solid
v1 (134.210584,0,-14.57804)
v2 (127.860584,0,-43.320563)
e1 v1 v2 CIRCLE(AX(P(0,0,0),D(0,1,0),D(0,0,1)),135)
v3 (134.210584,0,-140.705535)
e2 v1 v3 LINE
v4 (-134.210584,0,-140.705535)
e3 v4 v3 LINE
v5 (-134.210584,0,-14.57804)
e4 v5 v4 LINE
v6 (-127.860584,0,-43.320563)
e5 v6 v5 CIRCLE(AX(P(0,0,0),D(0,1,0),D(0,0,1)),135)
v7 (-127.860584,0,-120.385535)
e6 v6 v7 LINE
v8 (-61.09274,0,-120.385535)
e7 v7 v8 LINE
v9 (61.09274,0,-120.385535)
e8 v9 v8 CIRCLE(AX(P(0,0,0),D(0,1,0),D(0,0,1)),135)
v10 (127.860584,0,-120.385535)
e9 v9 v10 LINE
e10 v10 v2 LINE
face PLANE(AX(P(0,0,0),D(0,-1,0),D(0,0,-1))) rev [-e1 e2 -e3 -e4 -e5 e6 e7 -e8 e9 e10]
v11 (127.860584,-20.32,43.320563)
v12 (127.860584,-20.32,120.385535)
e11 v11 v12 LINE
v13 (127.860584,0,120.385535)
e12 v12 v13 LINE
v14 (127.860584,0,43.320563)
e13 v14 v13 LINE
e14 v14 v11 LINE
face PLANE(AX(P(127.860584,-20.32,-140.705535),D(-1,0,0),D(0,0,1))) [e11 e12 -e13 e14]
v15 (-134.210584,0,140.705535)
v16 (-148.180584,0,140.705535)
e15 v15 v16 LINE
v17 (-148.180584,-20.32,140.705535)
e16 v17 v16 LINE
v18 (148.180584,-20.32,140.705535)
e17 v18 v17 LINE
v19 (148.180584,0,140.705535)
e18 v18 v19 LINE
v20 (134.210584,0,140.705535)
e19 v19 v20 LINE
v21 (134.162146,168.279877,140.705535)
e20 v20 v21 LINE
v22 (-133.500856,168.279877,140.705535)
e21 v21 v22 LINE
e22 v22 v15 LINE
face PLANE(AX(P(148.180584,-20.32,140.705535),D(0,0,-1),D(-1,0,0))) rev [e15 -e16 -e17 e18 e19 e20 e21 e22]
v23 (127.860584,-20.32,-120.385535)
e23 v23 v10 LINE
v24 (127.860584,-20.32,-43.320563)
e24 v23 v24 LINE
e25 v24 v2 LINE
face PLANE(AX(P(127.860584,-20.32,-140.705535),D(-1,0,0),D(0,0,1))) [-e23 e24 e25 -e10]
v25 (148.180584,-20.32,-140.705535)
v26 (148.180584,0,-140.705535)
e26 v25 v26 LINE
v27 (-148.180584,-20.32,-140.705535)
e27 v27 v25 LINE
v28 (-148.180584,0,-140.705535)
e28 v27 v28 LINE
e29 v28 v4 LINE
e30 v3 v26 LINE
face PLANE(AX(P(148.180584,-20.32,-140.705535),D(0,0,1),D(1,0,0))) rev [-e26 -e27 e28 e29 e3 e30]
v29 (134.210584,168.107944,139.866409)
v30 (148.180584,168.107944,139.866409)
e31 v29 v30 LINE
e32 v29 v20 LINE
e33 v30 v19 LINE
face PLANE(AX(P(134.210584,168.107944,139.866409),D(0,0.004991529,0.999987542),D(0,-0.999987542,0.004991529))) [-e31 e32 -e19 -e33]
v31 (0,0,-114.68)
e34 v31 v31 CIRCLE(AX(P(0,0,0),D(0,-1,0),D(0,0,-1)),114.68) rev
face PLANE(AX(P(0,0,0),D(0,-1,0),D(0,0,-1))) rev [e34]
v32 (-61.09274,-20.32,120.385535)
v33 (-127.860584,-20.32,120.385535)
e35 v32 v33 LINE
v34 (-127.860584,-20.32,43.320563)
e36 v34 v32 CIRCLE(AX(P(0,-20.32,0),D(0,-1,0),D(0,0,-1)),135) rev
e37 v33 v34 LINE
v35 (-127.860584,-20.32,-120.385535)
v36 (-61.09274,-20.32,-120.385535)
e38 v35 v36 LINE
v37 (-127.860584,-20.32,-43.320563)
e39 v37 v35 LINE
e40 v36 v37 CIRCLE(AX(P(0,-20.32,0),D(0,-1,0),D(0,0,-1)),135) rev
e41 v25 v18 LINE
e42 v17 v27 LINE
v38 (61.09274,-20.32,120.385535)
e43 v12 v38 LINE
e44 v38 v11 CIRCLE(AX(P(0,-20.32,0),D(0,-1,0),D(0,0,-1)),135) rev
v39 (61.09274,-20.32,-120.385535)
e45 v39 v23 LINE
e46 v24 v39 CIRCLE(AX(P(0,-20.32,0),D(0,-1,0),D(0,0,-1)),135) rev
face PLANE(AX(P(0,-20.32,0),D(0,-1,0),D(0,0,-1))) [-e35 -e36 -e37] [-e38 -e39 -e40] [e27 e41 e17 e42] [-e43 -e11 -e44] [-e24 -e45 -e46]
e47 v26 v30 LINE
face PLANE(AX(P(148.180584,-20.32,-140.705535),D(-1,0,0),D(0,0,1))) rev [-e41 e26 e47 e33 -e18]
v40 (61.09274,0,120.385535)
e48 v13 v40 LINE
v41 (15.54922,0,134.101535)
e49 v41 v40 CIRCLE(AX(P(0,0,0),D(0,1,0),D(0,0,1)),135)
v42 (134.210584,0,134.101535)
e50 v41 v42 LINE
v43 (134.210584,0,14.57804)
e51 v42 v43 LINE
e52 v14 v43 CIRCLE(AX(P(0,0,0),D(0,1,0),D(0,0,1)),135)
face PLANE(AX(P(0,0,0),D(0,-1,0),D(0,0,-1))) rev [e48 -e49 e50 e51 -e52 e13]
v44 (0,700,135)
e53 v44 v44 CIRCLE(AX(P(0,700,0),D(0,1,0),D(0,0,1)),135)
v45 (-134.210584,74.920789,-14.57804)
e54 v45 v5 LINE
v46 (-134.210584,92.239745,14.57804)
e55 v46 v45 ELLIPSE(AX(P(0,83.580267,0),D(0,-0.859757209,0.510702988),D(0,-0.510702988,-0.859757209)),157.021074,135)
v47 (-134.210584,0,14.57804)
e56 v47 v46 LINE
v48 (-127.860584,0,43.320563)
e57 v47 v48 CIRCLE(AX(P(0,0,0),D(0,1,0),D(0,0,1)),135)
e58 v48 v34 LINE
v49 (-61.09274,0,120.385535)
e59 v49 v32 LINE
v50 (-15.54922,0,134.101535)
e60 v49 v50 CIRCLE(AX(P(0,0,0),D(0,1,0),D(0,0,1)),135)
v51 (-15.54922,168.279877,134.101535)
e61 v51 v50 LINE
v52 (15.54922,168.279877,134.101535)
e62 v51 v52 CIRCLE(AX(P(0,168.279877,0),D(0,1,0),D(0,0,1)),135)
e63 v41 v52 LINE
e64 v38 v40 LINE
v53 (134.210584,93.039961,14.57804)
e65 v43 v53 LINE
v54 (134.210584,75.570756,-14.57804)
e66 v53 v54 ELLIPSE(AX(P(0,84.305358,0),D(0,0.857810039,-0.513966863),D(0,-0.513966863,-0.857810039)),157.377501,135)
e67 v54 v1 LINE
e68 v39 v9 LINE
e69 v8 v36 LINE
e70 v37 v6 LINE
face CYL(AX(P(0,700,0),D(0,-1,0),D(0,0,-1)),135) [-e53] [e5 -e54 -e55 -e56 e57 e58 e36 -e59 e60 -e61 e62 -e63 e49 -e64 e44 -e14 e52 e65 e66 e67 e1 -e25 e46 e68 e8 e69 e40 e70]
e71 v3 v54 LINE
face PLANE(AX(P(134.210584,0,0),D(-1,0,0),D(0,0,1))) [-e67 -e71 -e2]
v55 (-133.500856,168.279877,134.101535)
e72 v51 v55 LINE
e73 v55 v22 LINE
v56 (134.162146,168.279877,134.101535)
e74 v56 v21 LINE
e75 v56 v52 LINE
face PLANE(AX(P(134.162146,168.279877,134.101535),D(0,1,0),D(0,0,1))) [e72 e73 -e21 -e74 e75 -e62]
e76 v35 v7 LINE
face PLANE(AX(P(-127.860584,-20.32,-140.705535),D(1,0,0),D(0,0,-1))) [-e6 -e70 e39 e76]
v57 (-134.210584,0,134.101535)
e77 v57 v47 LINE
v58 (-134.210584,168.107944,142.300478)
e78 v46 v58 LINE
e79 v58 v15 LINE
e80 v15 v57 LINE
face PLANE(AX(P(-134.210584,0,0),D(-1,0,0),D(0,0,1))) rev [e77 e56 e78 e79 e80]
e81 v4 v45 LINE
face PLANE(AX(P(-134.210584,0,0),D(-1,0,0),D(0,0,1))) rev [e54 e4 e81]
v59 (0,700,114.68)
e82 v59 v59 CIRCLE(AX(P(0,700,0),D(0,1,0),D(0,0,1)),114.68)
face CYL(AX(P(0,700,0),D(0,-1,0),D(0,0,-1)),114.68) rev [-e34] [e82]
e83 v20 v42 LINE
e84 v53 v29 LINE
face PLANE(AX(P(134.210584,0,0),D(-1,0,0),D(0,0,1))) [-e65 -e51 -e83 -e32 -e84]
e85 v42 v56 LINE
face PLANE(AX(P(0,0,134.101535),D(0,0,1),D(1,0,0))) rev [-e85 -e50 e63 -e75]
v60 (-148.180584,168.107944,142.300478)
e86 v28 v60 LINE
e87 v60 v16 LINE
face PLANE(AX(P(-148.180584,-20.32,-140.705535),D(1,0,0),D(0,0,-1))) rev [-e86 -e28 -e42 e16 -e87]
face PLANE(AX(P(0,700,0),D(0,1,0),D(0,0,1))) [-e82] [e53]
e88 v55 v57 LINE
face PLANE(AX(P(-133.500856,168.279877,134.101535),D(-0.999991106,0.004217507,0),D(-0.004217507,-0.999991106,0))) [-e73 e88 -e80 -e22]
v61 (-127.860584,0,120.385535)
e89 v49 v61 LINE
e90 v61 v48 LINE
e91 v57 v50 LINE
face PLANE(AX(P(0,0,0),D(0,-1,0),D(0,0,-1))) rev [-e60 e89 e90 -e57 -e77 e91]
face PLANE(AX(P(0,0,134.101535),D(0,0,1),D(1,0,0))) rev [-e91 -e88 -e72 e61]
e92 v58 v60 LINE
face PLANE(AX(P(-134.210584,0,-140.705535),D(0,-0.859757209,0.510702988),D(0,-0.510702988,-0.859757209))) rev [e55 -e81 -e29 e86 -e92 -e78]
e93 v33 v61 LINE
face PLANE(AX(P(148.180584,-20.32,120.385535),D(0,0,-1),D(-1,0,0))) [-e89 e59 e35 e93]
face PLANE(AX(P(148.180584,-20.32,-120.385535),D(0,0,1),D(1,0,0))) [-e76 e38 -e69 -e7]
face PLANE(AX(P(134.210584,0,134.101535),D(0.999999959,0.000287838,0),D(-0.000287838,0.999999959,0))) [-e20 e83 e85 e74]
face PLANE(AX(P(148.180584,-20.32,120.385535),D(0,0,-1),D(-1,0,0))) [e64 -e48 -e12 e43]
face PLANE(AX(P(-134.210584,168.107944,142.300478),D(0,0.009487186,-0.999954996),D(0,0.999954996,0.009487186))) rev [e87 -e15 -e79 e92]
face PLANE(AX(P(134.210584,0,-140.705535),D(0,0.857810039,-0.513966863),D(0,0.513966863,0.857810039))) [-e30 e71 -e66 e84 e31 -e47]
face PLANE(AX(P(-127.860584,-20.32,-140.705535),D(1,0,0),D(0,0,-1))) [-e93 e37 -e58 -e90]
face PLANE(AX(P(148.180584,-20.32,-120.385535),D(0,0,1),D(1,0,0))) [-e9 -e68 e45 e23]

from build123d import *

# Parameters (mm, degrees)
SKETCH1_R           = 135
BOSS_EXTRUDE1_DEPTH = 700
SKETCH2_W           = 296.361167152
SKETCH2_H           = 281.411070578
BOSS_EXTRUDE2_DEPTH = 20.32
SHELL1_T            = -20.32
SHELL2_START        = -20.32
SHELL2_DEPTH        = 20.32
BOSS_EXTRUDE3_DEPTH = 13.97
BOSS_EXTRUDE4_DEPTH = 13.97
BOSS_EXTRUDE5_DEPTH = 6.604


# Read off the part's stored shape, not the designer's step: Shell2
with BuildPart() as part:
    # Sketch1 → Boss-Extrude1 (new body)
    with BuildSketch(Plane(origin=(0, 0, 0), x_dir=(1, 0, 0), z_dir=(0, 1, 0))):
        with Locations(Location((0, 0, 0), (0, 0, 270))):
            Circle(SKETCH1_R)
    extrude(amount=BOSS_EXTRUDE1_DEPTH)

    # Sketch2 → Boss-Extrude2 (add)
    with BuildSketch(Plane(origin=(0, 0, 0), x_dir=(-1, 0, 0), z_dir=(0, -1, 0))):
        Rectangle(SKETCH2_W, SKETCH2_H)
    extrude(amount=BOSS_EXTRUDE2_DEPTH)

    # Shell1
    shell1_openings = [part.faces().sort_by_distance(p)[0] for p in [
        (0, 700, 0),
    ]]
    offset(amount=SHELL1_T, openings=shell1_openings, kind=Kind.INTERSECTION)

    # Shell2 outline → Shell2 (cut)
    with BuildSketch(Plane(origin=(0, 0, 0), x_dir=(1, 0, 0), z_dir=(0, 1, 0)).offset(SHELL2_START)):
        with BuildLine():
            Line((-127.860583576, -43.320562873), (-127.860583576, -120.385535289))
            Line((-127.860583576, -120.385535289), (-61.092740103, -120.385535289))
            ThreePointArc((-61.092740103, -120.385535289), (-102.032309224, -88.399139557), (-127.860583576, -43.320562873))
        make_face()
        with BuildLine():
            Line((-127.860583576, 120.385535289), (-127.860583576, 43.320562873))
            ThreePointArc((-127.860583576, 43.320562873), (-102.032309224, 88.399139557), (-61.092740103, 120.385535289))
            Line((-61.092740103, 120.385535289), (-127.860583576, 120.385535289))
        make_face()
        with BuildLine():
            ThreePointArc((127.860583576, -43.320562873), (102.032309224, -88.399139557), (61.092740103, -120.385535289))
            Line((61.092740103, -120.385535289), (127.860583576, -120.385535289))
            Line((127.860583576, -120.385535289), (127.860583576, -43.320562873))
        make_face()
        with BuildLine():
            Line((127.860583576, 120.385535289), (61.092740103, 120.385535289))
            ThreePointArc((61.092740103, 120.385535289), (102.032309224, 88.399139557), (127.860583576, 43.320562873))
            Line((127.860583576, 43.320562873), (127.860583576, 120.385535289))
        make_face()
    extrude(amount=SHELL2_DEPTH, mode=Mode.SUBTRACT)

    # Sketch3 → Boss-Extrude3 (add)
    with BuildSketch(Plane.ZY.offset(148.180583576)):
        Polygon((-140.705535289, 0), (142.300478433, 168.1079442), (140.705535289, 0), align=None)
    extrude(amount=-BOSS_EXTRUDE3_DEPTH)

    # Sketch4 → Boss-Extrude4 (add)
    with BuildSketch(Plane(origin=(148.180583576, 0, 0), x_dir=(0, 0, -1), z_dir=(1, 0, 0))):
        Polygon((140.705535289, 0), (-139.866409205, 168.107944167), (-140.705535289, 0), align=None)
    extrude(amount=-BOSS_EXTRUDE4_DEPTH)

    # Sketch6 → Boss-Extrude5 (add)
    with BuildSketch(Plane.XY.offset(140.705535289)):
        Polygon((134.162146303, 168.27987687), (-133.500855759, 168.27987687), (-134.210583576, 0), (134.210583576, 0), align=None)
    extrude(amount=-BOSS_EXTRUDE5_DEPTH)


solid = part.part
